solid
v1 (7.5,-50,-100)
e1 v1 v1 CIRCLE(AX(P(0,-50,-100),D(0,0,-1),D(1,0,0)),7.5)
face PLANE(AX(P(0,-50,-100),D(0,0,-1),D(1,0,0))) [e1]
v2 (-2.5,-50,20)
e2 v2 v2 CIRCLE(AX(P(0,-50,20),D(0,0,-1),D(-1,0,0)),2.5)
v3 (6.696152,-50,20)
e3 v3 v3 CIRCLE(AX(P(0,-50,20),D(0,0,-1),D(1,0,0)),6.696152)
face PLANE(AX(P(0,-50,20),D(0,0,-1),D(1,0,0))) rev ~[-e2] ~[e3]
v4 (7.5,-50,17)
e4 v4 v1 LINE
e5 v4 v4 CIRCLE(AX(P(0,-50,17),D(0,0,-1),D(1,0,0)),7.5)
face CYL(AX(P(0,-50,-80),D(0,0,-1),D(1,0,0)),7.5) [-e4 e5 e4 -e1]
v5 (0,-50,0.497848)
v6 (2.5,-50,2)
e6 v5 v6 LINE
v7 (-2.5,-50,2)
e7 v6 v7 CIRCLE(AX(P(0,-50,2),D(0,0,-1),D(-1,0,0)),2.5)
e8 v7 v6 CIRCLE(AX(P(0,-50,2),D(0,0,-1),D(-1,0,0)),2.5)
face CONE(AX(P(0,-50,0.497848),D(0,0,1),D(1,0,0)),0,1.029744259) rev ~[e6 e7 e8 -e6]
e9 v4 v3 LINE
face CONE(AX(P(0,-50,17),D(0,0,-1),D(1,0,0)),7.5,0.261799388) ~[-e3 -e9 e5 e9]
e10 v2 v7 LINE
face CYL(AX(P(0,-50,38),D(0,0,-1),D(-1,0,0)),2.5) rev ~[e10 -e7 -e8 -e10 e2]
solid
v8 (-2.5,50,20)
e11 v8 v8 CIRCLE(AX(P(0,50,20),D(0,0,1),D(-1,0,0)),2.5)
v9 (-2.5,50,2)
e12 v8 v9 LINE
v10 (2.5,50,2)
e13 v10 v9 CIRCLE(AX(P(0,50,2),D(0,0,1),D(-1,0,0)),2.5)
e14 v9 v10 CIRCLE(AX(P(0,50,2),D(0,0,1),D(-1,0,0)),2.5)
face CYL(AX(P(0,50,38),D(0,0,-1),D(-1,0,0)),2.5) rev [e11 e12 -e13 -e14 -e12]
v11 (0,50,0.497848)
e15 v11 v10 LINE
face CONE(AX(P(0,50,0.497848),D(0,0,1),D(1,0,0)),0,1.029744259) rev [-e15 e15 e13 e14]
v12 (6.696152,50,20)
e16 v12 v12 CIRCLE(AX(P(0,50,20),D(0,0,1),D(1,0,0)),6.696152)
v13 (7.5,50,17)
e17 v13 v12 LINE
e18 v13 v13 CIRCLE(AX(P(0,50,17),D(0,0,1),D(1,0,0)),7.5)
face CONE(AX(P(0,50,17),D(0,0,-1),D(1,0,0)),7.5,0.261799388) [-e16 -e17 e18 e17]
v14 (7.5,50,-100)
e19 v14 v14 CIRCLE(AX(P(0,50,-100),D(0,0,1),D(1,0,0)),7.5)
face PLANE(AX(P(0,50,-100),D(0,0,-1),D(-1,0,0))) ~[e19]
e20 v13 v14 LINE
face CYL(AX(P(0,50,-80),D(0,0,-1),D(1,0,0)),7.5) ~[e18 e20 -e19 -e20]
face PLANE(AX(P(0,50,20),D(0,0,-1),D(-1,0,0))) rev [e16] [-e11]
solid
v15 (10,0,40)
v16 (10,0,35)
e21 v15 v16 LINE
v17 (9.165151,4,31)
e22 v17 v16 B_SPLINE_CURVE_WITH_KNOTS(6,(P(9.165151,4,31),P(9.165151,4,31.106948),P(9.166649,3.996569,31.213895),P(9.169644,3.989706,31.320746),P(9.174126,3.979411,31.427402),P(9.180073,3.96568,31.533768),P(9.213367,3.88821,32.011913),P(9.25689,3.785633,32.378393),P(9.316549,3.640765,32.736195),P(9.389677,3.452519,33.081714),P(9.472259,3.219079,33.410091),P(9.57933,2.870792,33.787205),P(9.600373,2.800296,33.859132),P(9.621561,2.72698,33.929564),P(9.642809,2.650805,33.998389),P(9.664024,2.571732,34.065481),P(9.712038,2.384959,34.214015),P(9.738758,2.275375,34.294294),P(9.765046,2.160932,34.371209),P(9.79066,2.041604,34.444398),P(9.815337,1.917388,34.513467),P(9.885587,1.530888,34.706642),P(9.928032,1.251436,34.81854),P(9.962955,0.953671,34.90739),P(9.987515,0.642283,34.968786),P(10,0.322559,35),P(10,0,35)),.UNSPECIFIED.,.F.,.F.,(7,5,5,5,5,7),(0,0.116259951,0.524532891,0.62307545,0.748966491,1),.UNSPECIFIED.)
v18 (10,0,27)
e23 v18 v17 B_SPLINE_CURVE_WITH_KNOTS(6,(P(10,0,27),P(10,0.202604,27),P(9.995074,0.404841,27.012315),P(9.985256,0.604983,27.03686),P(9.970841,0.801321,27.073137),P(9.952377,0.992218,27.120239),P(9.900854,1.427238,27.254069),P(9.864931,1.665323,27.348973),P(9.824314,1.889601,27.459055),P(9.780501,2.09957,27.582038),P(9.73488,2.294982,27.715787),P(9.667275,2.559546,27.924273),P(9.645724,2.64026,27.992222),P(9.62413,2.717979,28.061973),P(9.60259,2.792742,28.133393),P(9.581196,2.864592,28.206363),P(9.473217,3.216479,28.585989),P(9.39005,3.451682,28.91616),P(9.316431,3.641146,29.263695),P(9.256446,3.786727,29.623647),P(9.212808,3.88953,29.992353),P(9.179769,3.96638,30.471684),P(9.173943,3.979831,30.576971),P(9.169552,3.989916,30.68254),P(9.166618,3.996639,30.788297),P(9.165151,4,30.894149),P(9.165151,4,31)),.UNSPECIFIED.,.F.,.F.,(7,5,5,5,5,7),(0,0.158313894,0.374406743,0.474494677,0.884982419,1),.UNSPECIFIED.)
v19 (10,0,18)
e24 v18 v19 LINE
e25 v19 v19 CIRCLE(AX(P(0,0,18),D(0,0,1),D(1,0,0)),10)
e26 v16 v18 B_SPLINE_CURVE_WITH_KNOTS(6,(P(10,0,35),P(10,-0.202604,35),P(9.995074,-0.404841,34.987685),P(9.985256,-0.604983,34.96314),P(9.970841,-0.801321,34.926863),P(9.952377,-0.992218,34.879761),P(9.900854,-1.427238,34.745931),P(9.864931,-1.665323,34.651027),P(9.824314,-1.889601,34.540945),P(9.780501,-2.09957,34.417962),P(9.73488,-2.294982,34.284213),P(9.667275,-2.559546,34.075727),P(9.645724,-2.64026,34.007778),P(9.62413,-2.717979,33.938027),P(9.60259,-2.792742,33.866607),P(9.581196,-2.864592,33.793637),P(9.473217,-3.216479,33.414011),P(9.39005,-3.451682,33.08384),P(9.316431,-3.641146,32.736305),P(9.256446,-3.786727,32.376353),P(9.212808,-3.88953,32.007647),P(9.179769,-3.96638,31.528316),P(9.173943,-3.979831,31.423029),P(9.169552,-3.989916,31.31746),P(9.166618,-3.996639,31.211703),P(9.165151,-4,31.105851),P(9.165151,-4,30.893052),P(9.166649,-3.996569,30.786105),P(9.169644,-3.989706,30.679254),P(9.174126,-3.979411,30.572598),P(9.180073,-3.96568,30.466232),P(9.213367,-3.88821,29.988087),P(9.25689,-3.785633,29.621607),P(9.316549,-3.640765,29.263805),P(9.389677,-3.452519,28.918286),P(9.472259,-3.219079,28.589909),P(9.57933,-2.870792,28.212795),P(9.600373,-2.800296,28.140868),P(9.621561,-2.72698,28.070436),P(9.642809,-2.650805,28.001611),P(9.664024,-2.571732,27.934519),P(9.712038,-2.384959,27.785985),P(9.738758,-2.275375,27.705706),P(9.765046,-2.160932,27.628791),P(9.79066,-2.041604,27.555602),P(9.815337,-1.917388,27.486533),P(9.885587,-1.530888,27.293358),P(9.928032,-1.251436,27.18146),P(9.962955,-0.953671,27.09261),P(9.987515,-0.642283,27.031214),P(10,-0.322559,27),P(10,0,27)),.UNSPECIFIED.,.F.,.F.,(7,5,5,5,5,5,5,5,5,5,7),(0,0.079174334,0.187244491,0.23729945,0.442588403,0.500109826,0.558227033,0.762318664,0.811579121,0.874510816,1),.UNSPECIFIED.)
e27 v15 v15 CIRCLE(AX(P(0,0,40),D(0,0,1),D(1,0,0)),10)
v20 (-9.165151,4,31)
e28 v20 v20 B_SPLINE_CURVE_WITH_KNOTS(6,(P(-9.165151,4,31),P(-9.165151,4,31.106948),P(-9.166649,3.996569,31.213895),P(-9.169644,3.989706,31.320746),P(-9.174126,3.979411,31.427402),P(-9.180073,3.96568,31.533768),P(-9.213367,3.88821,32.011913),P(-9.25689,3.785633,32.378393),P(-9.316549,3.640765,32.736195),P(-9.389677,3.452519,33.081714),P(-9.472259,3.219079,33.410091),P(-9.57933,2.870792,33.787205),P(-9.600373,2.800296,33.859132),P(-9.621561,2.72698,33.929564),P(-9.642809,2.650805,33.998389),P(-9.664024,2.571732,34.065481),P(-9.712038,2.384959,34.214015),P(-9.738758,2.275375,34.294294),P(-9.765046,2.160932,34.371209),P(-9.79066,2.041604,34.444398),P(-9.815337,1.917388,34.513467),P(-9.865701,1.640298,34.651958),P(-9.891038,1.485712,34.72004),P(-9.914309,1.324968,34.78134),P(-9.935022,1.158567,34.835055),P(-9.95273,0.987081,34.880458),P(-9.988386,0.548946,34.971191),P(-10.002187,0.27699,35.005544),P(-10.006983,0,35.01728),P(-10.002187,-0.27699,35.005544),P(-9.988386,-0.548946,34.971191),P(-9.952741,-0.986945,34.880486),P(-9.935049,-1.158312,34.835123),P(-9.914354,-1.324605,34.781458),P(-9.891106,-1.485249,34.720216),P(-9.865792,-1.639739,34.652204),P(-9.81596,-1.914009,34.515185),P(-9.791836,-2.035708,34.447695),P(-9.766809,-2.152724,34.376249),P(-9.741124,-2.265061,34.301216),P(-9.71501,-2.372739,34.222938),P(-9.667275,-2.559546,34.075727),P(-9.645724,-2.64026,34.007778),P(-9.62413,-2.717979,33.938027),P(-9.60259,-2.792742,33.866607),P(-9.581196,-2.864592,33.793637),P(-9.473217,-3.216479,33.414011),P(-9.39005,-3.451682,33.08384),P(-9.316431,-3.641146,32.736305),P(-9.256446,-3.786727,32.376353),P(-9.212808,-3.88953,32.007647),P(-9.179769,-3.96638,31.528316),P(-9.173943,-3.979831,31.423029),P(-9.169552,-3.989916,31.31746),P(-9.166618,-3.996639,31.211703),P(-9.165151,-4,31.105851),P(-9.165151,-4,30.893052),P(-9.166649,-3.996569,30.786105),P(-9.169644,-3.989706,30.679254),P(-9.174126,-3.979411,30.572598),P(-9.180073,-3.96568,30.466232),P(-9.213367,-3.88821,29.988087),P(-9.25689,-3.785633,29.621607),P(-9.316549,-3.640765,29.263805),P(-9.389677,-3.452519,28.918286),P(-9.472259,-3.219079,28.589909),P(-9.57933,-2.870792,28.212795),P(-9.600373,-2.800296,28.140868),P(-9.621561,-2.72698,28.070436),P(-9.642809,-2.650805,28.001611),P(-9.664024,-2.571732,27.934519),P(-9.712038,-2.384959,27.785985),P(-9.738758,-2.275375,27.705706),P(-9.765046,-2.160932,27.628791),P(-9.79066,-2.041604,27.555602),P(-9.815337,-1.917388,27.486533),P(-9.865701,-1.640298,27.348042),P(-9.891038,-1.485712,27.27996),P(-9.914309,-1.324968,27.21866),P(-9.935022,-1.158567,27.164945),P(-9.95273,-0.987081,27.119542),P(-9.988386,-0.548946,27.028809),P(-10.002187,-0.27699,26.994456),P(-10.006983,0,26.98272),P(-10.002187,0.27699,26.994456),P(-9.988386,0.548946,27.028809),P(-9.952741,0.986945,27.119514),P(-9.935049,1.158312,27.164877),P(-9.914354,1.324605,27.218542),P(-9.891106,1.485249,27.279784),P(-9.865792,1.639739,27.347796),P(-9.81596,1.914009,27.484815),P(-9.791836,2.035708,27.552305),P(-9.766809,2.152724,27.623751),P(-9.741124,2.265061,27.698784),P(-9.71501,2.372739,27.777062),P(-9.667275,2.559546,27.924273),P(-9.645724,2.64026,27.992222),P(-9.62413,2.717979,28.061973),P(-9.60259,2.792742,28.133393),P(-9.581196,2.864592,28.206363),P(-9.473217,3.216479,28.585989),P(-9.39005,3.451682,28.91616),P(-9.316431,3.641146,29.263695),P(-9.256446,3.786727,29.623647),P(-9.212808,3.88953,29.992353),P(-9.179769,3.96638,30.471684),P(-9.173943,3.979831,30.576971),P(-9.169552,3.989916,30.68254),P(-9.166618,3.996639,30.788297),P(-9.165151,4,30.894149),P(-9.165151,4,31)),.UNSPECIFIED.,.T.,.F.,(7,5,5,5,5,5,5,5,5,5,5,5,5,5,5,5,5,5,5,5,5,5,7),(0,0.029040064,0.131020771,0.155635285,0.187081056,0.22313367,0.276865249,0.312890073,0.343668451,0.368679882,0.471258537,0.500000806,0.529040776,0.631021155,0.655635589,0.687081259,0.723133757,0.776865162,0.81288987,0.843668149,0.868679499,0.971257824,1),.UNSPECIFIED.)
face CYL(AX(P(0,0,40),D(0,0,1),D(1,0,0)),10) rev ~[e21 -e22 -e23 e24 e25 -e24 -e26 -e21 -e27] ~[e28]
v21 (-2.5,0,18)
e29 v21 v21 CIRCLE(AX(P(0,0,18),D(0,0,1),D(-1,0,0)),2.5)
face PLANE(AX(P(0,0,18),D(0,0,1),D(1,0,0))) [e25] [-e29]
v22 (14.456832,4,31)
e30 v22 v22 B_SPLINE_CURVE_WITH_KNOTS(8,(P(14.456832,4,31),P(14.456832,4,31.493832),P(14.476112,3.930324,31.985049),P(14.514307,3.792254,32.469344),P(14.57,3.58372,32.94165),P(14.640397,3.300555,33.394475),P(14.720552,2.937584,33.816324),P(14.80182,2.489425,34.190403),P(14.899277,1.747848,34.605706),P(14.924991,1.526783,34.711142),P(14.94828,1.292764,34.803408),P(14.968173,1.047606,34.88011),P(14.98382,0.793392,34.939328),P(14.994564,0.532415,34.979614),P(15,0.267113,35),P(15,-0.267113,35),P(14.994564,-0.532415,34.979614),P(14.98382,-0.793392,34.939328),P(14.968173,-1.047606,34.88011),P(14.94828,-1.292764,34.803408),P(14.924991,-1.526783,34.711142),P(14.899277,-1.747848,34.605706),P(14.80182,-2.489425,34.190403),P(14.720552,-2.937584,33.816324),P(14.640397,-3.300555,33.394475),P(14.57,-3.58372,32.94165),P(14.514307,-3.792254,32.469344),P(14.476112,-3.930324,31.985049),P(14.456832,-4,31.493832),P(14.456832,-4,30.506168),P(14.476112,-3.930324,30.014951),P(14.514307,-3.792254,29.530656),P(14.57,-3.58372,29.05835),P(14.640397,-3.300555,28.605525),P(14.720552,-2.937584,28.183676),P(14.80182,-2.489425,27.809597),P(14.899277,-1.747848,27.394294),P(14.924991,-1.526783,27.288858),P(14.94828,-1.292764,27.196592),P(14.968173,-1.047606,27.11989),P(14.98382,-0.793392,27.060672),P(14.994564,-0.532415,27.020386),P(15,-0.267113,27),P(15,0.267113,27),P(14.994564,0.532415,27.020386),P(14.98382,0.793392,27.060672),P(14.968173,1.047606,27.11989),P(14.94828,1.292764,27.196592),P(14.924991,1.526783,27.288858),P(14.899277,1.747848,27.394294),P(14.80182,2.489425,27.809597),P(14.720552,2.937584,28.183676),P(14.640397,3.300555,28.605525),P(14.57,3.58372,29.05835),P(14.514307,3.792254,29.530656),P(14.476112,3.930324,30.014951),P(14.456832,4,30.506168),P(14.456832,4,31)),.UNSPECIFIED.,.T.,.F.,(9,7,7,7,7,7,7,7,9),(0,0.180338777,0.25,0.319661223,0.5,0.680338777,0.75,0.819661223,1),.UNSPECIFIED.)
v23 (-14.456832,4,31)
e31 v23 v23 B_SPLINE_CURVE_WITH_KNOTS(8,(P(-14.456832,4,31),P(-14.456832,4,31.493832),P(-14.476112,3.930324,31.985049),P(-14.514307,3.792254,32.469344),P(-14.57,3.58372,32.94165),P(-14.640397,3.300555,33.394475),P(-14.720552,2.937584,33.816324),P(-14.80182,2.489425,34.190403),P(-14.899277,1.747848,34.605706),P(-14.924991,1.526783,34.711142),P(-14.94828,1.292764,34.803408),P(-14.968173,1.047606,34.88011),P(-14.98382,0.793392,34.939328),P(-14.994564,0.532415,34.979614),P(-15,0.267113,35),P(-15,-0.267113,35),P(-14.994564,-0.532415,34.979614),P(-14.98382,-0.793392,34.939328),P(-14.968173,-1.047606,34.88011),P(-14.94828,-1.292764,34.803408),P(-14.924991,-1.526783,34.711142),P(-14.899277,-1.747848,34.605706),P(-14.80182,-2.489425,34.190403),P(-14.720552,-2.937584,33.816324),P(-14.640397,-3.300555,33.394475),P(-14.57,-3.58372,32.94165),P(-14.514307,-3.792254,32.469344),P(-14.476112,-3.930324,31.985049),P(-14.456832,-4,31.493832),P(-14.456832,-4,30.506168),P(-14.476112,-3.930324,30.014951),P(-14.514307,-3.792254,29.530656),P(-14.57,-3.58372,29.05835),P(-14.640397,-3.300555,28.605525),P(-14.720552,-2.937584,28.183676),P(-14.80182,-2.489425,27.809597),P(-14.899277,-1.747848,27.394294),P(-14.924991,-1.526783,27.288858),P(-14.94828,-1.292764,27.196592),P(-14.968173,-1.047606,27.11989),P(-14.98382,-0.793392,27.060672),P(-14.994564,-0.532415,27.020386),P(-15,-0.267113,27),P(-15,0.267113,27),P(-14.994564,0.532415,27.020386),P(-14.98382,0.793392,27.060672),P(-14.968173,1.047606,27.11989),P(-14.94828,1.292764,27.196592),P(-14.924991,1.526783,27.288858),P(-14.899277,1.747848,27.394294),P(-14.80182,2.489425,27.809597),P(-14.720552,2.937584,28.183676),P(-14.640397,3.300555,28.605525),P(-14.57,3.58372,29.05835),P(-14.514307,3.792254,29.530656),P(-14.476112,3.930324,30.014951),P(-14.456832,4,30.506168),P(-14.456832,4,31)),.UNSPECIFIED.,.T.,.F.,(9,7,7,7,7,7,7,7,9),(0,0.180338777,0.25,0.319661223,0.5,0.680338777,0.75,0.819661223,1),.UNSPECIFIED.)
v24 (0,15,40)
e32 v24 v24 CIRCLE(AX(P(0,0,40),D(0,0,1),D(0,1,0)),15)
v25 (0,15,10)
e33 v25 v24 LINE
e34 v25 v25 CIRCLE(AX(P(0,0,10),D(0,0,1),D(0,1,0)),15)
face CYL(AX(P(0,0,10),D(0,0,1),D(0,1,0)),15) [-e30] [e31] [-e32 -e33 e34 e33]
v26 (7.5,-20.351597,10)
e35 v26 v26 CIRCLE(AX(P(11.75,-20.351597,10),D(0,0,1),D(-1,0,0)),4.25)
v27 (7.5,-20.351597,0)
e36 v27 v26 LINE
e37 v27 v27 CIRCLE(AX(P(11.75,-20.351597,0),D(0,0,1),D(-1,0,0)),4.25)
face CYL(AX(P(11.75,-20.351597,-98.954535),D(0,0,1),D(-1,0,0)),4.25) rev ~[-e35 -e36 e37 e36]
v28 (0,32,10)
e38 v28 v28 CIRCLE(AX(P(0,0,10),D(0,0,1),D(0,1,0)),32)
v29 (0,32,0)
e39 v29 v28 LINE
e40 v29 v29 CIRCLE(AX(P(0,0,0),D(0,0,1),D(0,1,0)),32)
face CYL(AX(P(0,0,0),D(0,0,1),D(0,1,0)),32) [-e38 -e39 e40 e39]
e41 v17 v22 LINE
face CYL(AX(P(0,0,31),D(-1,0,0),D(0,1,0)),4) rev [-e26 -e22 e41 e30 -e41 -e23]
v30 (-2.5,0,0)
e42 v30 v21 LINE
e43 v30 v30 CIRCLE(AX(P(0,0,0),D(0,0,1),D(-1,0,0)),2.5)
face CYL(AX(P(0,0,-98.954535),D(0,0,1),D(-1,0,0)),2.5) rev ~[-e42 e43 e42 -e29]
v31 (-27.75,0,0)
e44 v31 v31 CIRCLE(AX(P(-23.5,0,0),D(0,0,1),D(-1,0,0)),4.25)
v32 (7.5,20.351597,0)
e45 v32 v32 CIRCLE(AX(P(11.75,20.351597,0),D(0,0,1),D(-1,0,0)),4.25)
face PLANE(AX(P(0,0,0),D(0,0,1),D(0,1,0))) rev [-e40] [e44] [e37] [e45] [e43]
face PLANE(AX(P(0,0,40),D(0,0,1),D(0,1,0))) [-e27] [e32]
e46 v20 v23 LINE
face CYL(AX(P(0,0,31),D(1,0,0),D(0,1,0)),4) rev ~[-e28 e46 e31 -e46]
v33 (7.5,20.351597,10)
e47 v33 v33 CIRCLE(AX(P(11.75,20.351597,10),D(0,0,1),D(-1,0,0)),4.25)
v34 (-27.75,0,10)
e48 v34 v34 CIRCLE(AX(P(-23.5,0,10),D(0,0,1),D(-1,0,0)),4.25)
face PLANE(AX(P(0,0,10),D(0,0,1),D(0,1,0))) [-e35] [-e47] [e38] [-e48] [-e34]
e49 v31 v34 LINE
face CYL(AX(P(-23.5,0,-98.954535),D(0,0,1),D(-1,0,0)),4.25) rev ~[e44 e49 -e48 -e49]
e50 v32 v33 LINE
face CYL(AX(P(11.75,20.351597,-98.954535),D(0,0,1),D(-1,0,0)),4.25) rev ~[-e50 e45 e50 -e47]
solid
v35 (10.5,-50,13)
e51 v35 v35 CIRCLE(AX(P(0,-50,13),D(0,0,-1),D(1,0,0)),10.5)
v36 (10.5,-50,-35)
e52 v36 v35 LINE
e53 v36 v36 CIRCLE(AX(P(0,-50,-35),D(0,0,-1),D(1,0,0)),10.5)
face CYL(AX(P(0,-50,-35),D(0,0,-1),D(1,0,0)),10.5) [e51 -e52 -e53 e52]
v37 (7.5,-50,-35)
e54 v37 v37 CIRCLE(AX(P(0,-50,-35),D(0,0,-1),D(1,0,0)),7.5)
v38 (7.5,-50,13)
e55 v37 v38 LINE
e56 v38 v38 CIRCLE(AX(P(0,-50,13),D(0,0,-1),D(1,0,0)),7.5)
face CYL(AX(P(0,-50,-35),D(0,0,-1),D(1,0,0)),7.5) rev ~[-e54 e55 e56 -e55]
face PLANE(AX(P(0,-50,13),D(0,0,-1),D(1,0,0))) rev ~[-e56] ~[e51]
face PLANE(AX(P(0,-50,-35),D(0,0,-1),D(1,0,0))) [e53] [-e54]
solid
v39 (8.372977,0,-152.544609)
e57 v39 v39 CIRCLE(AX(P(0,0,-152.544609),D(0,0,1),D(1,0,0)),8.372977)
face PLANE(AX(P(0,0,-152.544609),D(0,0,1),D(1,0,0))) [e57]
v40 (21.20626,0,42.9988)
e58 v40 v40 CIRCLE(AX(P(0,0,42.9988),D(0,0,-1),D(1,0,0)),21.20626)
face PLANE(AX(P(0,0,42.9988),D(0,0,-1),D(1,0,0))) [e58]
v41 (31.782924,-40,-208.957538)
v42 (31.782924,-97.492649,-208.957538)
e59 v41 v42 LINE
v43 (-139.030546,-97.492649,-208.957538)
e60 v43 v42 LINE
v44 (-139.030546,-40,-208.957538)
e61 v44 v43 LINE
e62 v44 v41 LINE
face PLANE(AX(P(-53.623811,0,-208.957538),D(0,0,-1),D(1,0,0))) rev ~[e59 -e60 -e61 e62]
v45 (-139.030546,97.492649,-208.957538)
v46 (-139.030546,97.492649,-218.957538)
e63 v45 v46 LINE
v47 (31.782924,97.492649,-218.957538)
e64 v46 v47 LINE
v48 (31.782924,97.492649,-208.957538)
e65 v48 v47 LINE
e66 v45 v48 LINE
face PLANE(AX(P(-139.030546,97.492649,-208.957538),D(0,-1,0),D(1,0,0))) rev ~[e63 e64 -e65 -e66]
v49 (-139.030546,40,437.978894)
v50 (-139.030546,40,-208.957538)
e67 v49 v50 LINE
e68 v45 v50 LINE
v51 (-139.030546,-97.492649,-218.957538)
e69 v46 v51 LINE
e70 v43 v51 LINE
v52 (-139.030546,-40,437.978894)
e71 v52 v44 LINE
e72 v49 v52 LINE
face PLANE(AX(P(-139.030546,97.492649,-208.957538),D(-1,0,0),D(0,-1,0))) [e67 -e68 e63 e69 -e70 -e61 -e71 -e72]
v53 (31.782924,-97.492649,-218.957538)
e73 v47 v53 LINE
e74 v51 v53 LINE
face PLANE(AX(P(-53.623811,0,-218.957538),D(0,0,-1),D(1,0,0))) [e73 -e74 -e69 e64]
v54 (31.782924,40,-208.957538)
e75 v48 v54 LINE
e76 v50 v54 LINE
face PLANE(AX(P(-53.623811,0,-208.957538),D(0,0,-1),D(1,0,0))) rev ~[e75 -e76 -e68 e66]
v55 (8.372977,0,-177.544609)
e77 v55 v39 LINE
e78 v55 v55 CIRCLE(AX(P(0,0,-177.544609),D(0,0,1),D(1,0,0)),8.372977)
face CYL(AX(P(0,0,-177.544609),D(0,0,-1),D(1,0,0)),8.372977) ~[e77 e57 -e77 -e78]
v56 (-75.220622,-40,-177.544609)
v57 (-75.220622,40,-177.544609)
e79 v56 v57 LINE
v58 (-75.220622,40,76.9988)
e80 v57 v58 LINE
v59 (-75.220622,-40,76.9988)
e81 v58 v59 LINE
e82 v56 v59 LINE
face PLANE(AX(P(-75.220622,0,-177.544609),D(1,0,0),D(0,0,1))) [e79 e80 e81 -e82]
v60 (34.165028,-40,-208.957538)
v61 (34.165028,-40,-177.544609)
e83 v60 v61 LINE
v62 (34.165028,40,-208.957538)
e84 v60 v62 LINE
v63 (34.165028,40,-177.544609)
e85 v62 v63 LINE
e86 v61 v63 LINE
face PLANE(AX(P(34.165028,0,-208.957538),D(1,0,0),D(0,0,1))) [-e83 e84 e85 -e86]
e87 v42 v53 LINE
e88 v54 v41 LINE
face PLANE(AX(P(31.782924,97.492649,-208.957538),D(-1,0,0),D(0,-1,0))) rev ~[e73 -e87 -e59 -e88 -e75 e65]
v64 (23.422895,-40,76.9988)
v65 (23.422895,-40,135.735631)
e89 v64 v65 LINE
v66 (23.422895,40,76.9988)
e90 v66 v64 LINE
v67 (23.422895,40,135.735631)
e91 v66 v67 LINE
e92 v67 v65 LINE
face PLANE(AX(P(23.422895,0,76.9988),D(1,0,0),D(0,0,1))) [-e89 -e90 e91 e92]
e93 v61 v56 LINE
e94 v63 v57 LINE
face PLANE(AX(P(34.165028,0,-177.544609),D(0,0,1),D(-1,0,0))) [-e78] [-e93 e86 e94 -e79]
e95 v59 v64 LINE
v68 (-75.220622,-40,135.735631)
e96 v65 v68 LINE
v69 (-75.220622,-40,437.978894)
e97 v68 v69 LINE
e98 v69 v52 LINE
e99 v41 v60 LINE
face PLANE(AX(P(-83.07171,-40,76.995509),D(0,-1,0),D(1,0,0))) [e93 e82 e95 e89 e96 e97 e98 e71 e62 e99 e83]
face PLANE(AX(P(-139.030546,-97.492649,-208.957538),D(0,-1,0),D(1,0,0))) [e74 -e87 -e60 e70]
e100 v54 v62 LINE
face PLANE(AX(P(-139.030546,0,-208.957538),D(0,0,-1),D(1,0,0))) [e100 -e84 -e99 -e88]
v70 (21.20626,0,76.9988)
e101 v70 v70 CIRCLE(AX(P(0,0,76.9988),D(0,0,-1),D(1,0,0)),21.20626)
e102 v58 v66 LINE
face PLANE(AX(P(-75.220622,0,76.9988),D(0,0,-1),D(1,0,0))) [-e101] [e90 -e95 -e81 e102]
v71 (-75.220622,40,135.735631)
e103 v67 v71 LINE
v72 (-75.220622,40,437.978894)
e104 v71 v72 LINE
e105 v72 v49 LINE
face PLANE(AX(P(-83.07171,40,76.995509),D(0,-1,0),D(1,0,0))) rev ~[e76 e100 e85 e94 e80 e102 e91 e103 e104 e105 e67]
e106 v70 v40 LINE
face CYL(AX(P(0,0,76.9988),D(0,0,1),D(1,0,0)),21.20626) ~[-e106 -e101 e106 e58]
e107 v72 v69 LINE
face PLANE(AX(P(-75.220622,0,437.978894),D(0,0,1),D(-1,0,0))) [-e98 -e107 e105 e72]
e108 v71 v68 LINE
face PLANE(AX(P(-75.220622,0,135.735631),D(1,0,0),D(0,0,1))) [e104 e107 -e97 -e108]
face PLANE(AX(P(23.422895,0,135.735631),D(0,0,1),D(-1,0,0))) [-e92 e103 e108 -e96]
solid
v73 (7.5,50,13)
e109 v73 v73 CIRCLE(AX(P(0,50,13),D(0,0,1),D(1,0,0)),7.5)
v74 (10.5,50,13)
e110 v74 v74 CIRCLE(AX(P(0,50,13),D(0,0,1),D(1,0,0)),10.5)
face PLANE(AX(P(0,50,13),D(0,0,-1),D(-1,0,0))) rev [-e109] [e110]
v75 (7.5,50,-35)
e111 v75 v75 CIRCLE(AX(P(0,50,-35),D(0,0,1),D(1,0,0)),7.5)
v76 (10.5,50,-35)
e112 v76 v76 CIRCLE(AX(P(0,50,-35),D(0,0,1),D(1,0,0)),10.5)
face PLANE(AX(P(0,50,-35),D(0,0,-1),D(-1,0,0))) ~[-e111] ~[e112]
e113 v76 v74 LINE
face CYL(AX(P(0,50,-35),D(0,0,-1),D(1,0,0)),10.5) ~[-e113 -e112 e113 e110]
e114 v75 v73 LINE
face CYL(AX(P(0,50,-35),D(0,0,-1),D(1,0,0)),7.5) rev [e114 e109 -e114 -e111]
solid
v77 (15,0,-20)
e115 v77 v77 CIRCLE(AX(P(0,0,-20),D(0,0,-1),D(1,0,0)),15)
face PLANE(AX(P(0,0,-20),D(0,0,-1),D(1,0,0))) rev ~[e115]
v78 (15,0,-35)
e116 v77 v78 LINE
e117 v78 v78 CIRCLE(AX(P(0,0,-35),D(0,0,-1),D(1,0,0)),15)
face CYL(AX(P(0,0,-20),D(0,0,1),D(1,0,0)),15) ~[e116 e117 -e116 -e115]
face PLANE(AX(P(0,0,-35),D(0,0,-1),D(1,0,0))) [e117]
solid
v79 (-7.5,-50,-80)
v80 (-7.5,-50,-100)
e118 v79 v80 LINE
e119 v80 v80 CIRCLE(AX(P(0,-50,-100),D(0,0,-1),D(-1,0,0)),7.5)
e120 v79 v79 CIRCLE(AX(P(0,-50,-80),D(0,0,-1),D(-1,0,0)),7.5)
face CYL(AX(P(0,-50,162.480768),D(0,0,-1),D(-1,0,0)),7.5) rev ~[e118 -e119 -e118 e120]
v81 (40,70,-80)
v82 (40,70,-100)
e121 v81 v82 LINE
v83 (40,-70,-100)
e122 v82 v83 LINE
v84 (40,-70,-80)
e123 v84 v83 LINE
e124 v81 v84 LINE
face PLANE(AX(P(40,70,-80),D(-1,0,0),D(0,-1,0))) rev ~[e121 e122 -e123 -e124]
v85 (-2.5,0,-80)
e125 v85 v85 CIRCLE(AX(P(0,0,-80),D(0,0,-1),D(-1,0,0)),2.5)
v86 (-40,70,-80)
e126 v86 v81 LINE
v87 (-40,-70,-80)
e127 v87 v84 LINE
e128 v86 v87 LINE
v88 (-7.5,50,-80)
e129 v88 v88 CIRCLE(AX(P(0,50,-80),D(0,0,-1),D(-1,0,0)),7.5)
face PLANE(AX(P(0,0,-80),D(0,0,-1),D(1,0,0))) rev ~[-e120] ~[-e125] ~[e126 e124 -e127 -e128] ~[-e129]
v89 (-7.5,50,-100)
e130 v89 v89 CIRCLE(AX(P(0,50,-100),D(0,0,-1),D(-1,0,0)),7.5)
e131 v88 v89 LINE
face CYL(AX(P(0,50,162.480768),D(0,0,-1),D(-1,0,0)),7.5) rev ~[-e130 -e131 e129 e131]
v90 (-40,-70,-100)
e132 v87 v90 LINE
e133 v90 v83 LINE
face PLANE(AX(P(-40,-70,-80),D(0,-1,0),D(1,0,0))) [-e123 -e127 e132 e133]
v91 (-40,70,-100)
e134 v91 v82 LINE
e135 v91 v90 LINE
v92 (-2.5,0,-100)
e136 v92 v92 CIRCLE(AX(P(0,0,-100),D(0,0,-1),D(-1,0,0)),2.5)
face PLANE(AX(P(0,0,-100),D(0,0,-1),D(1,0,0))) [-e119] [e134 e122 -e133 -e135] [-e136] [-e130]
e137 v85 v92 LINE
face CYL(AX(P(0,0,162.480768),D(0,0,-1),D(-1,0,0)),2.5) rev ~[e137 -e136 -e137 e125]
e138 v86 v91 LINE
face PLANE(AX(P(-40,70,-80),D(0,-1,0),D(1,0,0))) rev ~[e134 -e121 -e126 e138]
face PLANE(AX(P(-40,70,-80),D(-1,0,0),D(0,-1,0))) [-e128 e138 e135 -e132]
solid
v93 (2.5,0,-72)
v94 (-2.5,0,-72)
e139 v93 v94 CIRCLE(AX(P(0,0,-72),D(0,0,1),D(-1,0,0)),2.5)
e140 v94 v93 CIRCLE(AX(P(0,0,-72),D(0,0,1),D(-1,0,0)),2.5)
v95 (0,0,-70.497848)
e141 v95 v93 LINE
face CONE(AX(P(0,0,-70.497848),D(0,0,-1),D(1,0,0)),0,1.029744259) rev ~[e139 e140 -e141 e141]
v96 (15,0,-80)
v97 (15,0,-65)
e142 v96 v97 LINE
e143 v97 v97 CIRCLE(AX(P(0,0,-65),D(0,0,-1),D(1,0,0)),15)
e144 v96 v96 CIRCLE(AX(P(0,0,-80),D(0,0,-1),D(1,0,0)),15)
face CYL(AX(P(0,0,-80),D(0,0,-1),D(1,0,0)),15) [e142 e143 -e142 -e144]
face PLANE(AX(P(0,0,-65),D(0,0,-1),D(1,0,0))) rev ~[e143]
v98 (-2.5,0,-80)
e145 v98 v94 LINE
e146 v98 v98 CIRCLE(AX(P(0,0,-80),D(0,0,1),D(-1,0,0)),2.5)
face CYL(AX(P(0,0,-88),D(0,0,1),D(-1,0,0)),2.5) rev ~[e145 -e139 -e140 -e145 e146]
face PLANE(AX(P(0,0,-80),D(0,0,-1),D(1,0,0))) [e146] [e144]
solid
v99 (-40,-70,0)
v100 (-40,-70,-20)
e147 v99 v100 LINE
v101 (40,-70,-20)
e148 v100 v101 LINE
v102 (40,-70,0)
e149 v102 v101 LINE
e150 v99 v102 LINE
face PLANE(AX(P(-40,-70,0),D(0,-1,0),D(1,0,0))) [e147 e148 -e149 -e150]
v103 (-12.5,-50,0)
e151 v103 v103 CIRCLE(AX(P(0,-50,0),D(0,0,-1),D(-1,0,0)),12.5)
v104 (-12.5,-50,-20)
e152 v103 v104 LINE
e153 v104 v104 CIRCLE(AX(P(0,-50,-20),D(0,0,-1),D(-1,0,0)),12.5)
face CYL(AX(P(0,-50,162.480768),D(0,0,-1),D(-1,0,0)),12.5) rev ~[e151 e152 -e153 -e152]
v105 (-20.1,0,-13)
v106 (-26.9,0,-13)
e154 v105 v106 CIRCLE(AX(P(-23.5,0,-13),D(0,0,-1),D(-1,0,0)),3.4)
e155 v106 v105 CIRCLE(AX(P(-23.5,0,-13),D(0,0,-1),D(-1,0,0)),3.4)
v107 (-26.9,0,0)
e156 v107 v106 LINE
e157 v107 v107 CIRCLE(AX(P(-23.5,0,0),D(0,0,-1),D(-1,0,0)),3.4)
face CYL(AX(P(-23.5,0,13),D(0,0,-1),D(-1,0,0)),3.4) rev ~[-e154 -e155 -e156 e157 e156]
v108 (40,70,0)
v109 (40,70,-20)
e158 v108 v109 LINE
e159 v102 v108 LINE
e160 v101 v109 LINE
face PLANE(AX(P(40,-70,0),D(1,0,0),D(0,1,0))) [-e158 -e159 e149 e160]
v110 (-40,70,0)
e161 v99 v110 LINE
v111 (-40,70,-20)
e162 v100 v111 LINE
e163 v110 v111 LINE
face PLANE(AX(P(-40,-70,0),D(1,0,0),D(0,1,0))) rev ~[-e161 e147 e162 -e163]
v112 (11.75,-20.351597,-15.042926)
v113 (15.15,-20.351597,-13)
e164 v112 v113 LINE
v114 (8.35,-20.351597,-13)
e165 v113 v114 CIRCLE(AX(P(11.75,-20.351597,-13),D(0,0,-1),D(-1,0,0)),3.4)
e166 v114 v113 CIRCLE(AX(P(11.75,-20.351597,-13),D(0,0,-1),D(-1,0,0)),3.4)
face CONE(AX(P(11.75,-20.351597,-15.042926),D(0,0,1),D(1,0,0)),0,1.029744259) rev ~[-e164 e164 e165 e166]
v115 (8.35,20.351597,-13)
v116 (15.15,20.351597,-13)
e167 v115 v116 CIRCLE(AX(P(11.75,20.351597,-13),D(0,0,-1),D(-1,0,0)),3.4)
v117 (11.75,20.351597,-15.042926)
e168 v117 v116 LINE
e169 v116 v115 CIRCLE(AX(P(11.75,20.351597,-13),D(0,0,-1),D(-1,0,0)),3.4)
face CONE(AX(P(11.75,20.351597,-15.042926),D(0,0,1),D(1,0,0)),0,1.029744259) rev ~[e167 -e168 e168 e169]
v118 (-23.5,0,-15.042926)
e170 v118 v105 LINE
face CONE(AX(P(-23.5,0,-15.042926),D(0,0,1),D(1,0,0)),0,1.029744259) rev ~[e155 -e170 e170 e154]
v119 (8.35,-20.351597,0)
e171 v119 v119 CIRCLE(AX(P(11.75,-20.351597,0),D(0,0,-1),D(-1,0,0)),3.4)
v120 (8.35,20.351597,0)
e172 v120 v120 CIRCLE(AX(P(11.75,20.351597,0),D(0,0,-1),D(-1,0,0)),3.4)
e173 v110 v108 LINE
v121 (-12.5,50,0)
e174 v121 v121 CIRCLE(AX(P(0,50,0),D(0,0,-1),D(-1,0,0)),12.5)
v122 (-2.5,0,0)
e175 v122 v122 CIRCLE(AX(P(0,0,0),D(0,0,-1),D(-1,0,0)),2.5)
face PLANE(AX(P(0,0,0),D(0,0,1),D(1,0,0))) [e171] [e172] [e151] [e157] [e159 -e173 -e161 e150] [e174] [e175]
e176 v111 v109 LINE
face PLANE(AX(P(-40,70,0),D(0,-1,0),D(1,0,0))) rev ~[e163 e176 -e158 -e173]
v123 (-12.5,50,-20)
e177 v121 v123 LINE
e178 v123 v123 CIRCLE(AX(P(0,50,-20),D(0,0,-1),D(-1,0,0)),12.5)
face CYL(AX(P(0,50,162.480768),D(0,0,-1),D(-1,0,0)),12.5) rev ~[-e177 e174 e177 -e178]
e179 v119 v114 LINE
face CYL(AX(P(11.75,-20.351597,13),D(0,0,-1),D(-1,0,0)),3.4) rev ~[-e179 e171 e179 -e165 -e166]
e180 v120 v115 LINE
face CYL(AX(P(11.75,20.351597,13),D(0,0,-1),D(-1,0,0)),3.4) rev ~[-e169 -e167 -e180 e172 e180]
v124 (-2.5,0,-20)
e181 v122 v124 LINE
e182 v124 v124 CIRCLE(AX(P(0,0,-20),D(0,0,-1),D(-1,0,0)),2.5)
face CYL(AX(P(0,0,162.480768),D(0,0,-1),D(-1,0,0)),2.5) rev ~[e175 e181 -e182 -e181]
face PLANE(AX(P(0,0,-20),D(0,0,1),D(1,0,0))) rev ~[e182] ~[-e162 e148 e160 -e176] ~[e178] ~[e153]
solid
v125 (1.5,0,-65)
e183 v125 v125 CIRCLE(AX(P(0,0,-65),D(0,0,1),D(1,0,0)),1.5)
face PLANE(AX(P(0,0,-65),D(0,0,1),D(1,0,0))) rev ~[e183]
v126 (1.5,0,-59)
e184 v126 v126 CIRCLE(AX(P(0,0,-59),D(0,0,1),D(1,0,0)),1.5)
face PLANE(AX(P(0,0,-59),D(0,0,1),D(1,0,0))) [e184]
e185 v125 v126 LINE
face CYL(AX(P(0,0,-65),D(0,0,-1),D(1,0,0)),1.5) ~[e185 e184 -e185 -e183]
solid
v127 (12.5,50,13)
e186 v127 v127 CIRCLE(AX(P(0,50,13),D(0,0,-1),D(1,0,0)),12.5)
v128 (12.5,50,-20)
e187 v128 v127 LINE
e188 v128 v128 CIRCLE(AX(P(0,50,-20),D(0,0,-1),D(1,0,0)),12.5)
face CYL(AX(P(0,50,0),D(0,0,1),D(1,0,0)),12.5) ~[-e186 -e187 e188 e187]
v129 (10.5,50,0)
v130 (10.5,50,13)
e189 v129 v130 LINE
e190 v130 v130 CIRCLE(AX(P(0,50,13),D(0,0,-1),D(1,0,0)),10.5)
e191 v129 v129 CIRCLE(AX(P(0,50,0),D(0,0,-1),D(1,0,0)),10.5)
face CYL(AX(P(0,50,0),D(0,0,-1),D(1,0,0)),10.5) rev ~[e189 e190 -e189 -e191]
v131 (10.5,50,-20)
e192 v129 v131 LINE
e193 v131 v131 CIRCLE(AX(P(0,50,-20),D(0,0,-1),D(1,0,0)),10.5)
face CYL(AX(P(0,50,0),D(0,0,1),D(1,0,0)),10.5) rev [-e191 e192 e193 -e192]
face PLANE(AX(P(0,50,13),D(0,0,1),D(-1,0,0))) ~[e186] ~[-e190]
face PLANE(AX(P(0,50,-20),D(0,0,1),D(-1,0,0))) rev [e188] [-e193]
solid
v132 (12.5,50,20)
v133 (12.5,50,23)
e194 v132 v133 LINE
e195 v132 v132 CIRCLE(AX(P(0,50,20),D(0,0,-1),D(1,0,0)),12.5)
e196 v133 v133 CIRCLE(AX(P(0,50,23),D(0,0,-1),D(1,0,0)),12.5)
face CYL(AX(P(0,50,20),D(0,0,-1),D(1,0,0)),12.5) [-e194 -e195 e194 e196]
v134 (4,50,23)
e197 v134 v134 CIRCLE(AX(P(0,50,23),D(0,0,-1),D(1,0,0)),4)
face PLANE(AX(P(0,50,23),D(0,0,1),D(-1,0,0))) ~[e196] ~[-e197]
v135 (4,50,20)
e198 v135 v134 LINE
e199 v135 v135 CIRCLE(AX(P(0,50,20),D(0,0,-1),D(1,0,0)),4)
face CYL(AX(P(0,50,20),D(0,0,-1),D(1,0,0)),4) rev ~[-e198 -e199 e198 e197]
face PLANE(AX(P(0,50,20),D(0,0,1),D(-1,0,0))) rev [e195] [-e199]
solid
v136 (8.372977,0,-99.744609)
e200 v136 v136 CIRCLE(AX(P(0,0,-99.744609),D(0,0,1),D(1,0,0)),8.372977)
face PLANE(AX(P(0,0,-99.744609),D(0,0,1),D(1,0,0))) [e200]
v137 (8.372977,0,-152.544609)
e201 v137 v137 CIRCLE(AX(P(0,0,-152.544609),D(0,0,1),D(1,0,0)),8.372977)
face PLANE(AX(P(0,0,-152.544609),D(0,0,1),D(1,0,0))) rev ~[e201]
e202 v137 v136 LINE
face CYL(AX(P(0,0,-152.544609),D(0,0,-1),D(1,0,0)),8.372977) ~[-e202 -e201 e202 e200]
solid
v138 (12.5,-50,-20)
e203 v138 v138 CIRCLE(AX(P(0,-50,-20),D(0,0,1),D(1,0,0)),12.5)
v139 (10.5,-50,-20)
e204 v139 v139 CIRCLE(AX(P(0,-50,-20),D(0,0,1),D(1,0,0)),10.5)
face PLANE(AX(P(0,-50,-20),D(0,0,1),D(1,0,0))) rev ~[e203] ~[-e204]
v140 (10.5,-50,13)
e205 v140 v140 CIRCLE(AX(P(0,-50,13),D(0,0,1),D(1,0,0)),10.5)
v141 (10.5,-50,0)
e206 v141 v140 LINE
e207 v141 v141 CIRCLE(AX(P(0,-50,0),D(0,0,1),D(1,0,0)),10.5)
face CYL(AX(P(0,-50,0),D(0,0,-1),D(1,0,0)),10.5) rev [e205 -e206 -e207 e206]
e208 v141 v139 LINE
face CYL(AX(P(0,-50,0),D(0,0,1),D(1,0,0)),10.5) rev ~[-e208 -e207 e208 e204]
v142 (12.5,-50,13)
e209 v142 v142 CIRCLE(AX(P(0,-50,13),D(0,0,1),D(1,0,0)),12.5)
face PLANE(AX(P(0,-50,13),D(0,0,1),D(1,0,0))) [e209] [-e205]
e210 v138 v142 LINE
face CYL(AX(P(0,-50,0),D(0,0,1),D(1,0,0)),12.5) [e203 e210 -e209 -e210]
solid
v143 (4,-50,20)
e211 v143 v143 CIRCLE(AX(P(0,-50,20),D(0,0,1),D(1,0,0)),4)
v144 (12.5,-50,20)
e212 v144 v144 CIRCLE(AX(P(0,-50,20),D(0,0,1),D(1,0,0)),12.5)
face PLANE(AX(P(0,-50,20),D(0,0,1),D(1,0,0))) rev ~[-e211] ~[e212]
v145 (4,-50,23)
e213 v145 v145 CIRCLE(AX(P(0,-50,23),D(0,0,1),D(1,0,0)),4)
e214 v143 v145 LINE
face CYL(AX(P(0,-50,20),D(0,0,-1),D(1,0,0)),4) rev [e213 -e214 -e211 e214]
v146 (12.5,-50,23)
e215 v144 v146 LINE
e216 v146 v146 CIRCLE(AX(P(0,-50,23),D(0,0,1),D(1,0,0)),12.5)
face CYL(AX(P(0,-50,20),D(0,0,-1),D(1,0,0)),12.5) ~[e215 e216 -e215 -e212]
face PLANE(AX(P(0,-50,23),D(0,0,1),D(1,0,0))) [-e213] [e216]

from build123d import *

# Parameters (mm, degrees)
F2_W           = 80
F2_H           = 140
F3_DEPTH       = 20
F5_W           = 80
F5_H           = 140
F6_DEPTH       = 20
F8_D           = 25
F9_D           = 15
F10_R          = 12.5
F10_R_2        = 10.5
F11_DEPTH      = 13
F11_DEPTH_BACK = 20
F12_R          = 7.5
F13_DEPTH      = 100
F13_DEPTH_BACK = 20
F14_SIZE2      = 0.8038475773
F14_SIZE       = 3
F16_D          = 5
F16_DEPTH      = 18
F16_TIP        = 1.5021515476
F17_R          = 12.5
F17_R_2        = 4
F18_DEPTH      = 3
F20_R          = 10.5
F20_R_2        = 7.5
F21_DEPTH      = 48
F25_R          = 10
F26_DEPTH      = 22
F27_R          = 4
F28_DEPTH      = 40.001
F28_DEPTH_BACK = 40.001
F30_D          = 8.5
F31_D          = 5
F32_R          = 15
F33_DEPTH      = 15
F35_D          = 5
F35_DEPTH      = 8
F35_TIP        = 1.5021515476
F36_R          = 15
F37_DEPTH      = 15
F38_D          = 6.8
F38_DEPTH      = 13
F38_TIP        = 2.0429261047
F39_D          = 5
F39_2_D        = 5
F40_R          = 1.5
F41_DEPTH      = 6
F43_DEPTH      = 40
F43_DEPTH_BACK = 40
F44_R          = 21.2062603524
F45_DEPTH      = 34
F46_R          = 8.372976597
F47_DEPTH      = 25
F48_W          = 170.8134700563
F48_H          = 194.9852970555
F49_DEPTH      = 10
F50_DEPTH      = 52.8


with BuildPart() as f3:
    # F2 (on Top) → F3 (new body)
    with BuildSketch(Plane.XY):
        Rectangle(F2_W, F2_H)
    extrude(amount=-F3_DEPTH)

    # F8 (through all)
    with Locations(Plane.XY):
        with Locations((0, -50), (0, 50)):
            Hole(F8_D / 2)

    # F38
    with Locations(Plane.XY):
        with Locations((11.75, 20.3515969889), (-23.5, 0), (11.75, -20.3515969889)):
            Hole(F38_D / 2, depth=F38_DEPTH)
            with Locations((0, 0, -(F38_DEPTH + F38_TIP / 2))):  # 118° drill point
                Cone(0, F38_D / 2, F38_TIP, mode=Mode.SUBTRACT)

    # F39 (through all)
    with Locations(Plane.XY):
        with Locations((0, 0)):
            Hole(F39_D / 2)


with BuildPart() as f6:
    # F5 (on offset) → F6 (new body)
    with BuildSketch(Plane(origin=(0, 0, -80), x_dir=(1, 0, 0), z_dir=(0, 0, -1))):
        Rectangle(F5_W, F5_H)
    extrude(amount=F6_DEPTH)

    # F9 (through all)
    with Locations(Plane.XY):
        with Locations((0, -50), (0, 50)):
            Hole(F9_D / 2)

    # F39#2 (through all)
    with Locations(Plane.XY):
        with Locations((0, 0)):
            Hole(F39_2_D / 2)


with BuildPart() as f11:
    # F10 (on Top) → F11 (new body, two sides)
    with BuildSketch(Plane.XY) as f11_sk:
        with Locations((0, -50)):
            Circle(F10_R)
        with Locations((0, -50)):
            Circle(F10_R_2, mode=Mode.SUBTRACT)
    extrude(amount=F11_DEPTH)
    extrude(f11_sk.sketch, amount=-F11_DEPTH_BACK)


with BuildPart() as f13:
    # F12 (on offset) → F13 (new body, two sides)
    with BuildSketch(Plane(origin=(0, 0, -80), x_dir=(1, 0, 0), z_dir=(0, 0, -1))) as f13_sk:
        with Locations((0, 50)):
            Circle(F12_R)
    extrude(amount=-F13_DEPTH)
    extrude(f13_sk.sketch, amount=F13_DEPTH_BACK)

    # F14
    f14_edges = [f13.edges().sort_by_distance(p)[0] for p in [
        (-7.5, -50, 20),
    ]]
    f14_side = f13.faces().sort_by_distance((-7.5, -50, -40))[0]
    chamfer(f14_edges, length=F14_SIZE, length2=F14_SIZE2, reference=f14_side)

    # F16
    with Locations(Plane.XY.offset(20)):
        with Locations((0, -50)):
            Hole(F16_D / 2, depth=F16_DEPTH)
            with Locations((0, 0, -(F16_DEPTH + F16_TIP / 2))):  # 118° drill point
                Cone(0, F16_D / 2, F16_TIP, mode=Mode.SUBTRACT)


with BuildPart() as f18:
    # F17 (on face) → F18 (new body)
    with BuildSketch(Plane.XY.offset(20)):
        with Locations((0, -50)):
            Circle(F17_R)
        with Locations((0, -50)):
            Circle(F17_R_2, mode=Mode.SUBTRACT)
    extrude(amount=F18_DEPTH)


with BuildPart() as f21:
    # F20 (on offset) → F21 (new body)
    with BuildSketch(Plane(origin=(0, 0, -35), x_dir=(1, 0, 0), z_dir=(0, 0, -1))):
        with Locations((0, 50)):
            Circle(F20_R)
        with Locations((0, 50)):
            Circle(F20_R_2, mode=Mode.SUBTRACT)
    extrude(amount=-F21_DEPTH)


with BuildPart() as f22_1:
    # F22: instance of F21
    add(f21.part.mirror(Plane.XZ))


with BuildPart() as f22_2:
    # F22: instance of F11
    add(f11.part.mirror(Plane.XZ))


with BuildPart() as f22_3:
    # F22: instance of F13
    add(f13.part.mirror(Plane.XZ))


with BuildPart() as f22_4:
    # F22: instance of F18
    add(f18.part.mirror(Plane.XZ))


with BuildPart() as f24:
    # F23 (on Right) → F24 (revolve)
    with BuildSketch(Plane.YZ):
        Polygon((0, 40), (0, 0), (32, 0), (32, 10), (15, 10), (15, 40), align=None)
    revolve(axis=Axis((0, 0, 35.5085860893), (0, 0, 1)))

    # F25 (on face) → F26 (cut)
    with BuildSketch(Plane.XY.offset(40)):
        Circle(F25_R)
    extrude(amount=-F26_DEPTH, mode=Mode.SUBTRACT)

    # F27 (on Right) → F28 (cut, two sides)
    with BuildSketch(Plane.YZ) as f28_sk:
        with Locations((0, 31)):
            Circle(F27_R)
    extrude(amount=-F28_DEPTH, mode=Mode.SUBTRACT)
    extrude(f28_sk.sketch, amount=F28_DEPTH_BACK, mode=Mode.SUBTRACT)

    # F30 (through all)
    with Locations(Plane(origin=(0, 0, 0), x_dir=(1, 0, 0), z_dir=(0, 0, -1))):
        with Locations((11.75, -20.3515969889), (-23.5, 0), (11.75, 20.3515969889)):
            Hole(F30_D / 2)

    # F31 (through all)
    with Locations(Plane(origin=(0, 0, 0), x_dir=(1, 0, 0), z_dir=(0, 0, -1))):
        with Locations((0, 0)):
            Hole(F31_D / 2)


with BuildPart() as f33:
    # F32 (on offset) → F33 (new body)
    with BuildSketch(Plane(origin=(0, 0, -80), x_dir=(1, 0, 0), z_dir=(0, 0, -1))):
        Circle(F32_R)
    extrude(amount=-F33_DEPTH)

    # F35
    with Locations(Plane(origin=(0, 0, -80), x_dir=(1, 0, 0), z_dir=(0, 0, -1))):
        with Locations((0, 0)):
            Hole(F35_D / 2, depth=F35_DEPTH)
            with Locations((0, 0, -(F35_DEPTH + F35_TIP / 2))):  # 118° drill point
                Cone(0, F35_D / 2, F35_TIP, mode=Mode.SUBTRACT)


with BuildPart() as f37:
    # F36 (on face) → F37 (new body)
    with BuildSketch(Plane(origin=(0, 0, -20), x_dir=(1, 0, 0), z_dir=(0, 0, -1))):
        Circle(F36_R)
    extrude(amount=F37_DEPTH)


with BuildPart() as f41:
    # F40 (on face) → F41 (new body)
    with BuildSketch(Plane.XY.offset(-65)):
        Circle(F40_R)
    extrude(amount=F41_DEPTH)


with BuildPart() as f43:
    # F42 (on Front) → F43 (new body, two sides)
    with BuildSketch(Plane.XZ) as f43_sk:
        Polygon((-75.2206221223, -177.5446087122), (-75.2206221223, 76.9988000393), (23.4228949994, 76.9988000393), (23.4228949994, 135.7356309891), (-75.2206221223, 135.7356309891), (-75.2206221223, 437.9788935184), (-139.0305459499, 437.9788935184), (-139.0305459499, -208.9575380087), (34.1650284827, -208.9575380087), (34.1650284827, -177.5446087122), align=None)
    extrude(amount=F43_DEPTH)
    extrude(f43_sk.sketch, amount=-F43_DEPTH_BACK)

    # F44 (on face) → F45 (join)
    with BuildSketch(Plane(origin=(0, 0, 76.9988000393), x_dir=(1, 0, 0), z_dir=(0, 0, -1))):
        Circle(F44_R)
    extrude(amount=F45_DEPTH)

    # F46 (on face) → F47 (join)
    with BuildSketch(Plane.XY.offset(-177.5446087122)):
        Circle(F46_R)
    extrude(amount=F47_DEPTH)

    # F48 (on face) → F49 (join)
    with BuildSketch(Plane(origin=(0, 0, -208.9575380087), x_dir=(1, 0, 0), z_dir=(0, 0, -1))):
        with Locations((-53.6238109218, 0)):
            Rectangle(F48_W, F48_H)
    extrude(amount=F49_DEPTH)


with BuildPart() as f50:
    # F50 (new): a face of the model
    f50_faces = [f43.part.faces().sort_by_distance(p)[0] for p in [
        (0, 0, -152.5446087122),
    ]]
    extrude(f50_faces, amount=F50_DEPTH)


solid = Compound([f3.part, f6.part, f11.part, f13.part, f18.part, f21.part, f22_1.part, f22_2.part, f22_3.part, f22_4.part, f24.part, f33.part, f37.part, f41.part, f43.part, f50.part])
